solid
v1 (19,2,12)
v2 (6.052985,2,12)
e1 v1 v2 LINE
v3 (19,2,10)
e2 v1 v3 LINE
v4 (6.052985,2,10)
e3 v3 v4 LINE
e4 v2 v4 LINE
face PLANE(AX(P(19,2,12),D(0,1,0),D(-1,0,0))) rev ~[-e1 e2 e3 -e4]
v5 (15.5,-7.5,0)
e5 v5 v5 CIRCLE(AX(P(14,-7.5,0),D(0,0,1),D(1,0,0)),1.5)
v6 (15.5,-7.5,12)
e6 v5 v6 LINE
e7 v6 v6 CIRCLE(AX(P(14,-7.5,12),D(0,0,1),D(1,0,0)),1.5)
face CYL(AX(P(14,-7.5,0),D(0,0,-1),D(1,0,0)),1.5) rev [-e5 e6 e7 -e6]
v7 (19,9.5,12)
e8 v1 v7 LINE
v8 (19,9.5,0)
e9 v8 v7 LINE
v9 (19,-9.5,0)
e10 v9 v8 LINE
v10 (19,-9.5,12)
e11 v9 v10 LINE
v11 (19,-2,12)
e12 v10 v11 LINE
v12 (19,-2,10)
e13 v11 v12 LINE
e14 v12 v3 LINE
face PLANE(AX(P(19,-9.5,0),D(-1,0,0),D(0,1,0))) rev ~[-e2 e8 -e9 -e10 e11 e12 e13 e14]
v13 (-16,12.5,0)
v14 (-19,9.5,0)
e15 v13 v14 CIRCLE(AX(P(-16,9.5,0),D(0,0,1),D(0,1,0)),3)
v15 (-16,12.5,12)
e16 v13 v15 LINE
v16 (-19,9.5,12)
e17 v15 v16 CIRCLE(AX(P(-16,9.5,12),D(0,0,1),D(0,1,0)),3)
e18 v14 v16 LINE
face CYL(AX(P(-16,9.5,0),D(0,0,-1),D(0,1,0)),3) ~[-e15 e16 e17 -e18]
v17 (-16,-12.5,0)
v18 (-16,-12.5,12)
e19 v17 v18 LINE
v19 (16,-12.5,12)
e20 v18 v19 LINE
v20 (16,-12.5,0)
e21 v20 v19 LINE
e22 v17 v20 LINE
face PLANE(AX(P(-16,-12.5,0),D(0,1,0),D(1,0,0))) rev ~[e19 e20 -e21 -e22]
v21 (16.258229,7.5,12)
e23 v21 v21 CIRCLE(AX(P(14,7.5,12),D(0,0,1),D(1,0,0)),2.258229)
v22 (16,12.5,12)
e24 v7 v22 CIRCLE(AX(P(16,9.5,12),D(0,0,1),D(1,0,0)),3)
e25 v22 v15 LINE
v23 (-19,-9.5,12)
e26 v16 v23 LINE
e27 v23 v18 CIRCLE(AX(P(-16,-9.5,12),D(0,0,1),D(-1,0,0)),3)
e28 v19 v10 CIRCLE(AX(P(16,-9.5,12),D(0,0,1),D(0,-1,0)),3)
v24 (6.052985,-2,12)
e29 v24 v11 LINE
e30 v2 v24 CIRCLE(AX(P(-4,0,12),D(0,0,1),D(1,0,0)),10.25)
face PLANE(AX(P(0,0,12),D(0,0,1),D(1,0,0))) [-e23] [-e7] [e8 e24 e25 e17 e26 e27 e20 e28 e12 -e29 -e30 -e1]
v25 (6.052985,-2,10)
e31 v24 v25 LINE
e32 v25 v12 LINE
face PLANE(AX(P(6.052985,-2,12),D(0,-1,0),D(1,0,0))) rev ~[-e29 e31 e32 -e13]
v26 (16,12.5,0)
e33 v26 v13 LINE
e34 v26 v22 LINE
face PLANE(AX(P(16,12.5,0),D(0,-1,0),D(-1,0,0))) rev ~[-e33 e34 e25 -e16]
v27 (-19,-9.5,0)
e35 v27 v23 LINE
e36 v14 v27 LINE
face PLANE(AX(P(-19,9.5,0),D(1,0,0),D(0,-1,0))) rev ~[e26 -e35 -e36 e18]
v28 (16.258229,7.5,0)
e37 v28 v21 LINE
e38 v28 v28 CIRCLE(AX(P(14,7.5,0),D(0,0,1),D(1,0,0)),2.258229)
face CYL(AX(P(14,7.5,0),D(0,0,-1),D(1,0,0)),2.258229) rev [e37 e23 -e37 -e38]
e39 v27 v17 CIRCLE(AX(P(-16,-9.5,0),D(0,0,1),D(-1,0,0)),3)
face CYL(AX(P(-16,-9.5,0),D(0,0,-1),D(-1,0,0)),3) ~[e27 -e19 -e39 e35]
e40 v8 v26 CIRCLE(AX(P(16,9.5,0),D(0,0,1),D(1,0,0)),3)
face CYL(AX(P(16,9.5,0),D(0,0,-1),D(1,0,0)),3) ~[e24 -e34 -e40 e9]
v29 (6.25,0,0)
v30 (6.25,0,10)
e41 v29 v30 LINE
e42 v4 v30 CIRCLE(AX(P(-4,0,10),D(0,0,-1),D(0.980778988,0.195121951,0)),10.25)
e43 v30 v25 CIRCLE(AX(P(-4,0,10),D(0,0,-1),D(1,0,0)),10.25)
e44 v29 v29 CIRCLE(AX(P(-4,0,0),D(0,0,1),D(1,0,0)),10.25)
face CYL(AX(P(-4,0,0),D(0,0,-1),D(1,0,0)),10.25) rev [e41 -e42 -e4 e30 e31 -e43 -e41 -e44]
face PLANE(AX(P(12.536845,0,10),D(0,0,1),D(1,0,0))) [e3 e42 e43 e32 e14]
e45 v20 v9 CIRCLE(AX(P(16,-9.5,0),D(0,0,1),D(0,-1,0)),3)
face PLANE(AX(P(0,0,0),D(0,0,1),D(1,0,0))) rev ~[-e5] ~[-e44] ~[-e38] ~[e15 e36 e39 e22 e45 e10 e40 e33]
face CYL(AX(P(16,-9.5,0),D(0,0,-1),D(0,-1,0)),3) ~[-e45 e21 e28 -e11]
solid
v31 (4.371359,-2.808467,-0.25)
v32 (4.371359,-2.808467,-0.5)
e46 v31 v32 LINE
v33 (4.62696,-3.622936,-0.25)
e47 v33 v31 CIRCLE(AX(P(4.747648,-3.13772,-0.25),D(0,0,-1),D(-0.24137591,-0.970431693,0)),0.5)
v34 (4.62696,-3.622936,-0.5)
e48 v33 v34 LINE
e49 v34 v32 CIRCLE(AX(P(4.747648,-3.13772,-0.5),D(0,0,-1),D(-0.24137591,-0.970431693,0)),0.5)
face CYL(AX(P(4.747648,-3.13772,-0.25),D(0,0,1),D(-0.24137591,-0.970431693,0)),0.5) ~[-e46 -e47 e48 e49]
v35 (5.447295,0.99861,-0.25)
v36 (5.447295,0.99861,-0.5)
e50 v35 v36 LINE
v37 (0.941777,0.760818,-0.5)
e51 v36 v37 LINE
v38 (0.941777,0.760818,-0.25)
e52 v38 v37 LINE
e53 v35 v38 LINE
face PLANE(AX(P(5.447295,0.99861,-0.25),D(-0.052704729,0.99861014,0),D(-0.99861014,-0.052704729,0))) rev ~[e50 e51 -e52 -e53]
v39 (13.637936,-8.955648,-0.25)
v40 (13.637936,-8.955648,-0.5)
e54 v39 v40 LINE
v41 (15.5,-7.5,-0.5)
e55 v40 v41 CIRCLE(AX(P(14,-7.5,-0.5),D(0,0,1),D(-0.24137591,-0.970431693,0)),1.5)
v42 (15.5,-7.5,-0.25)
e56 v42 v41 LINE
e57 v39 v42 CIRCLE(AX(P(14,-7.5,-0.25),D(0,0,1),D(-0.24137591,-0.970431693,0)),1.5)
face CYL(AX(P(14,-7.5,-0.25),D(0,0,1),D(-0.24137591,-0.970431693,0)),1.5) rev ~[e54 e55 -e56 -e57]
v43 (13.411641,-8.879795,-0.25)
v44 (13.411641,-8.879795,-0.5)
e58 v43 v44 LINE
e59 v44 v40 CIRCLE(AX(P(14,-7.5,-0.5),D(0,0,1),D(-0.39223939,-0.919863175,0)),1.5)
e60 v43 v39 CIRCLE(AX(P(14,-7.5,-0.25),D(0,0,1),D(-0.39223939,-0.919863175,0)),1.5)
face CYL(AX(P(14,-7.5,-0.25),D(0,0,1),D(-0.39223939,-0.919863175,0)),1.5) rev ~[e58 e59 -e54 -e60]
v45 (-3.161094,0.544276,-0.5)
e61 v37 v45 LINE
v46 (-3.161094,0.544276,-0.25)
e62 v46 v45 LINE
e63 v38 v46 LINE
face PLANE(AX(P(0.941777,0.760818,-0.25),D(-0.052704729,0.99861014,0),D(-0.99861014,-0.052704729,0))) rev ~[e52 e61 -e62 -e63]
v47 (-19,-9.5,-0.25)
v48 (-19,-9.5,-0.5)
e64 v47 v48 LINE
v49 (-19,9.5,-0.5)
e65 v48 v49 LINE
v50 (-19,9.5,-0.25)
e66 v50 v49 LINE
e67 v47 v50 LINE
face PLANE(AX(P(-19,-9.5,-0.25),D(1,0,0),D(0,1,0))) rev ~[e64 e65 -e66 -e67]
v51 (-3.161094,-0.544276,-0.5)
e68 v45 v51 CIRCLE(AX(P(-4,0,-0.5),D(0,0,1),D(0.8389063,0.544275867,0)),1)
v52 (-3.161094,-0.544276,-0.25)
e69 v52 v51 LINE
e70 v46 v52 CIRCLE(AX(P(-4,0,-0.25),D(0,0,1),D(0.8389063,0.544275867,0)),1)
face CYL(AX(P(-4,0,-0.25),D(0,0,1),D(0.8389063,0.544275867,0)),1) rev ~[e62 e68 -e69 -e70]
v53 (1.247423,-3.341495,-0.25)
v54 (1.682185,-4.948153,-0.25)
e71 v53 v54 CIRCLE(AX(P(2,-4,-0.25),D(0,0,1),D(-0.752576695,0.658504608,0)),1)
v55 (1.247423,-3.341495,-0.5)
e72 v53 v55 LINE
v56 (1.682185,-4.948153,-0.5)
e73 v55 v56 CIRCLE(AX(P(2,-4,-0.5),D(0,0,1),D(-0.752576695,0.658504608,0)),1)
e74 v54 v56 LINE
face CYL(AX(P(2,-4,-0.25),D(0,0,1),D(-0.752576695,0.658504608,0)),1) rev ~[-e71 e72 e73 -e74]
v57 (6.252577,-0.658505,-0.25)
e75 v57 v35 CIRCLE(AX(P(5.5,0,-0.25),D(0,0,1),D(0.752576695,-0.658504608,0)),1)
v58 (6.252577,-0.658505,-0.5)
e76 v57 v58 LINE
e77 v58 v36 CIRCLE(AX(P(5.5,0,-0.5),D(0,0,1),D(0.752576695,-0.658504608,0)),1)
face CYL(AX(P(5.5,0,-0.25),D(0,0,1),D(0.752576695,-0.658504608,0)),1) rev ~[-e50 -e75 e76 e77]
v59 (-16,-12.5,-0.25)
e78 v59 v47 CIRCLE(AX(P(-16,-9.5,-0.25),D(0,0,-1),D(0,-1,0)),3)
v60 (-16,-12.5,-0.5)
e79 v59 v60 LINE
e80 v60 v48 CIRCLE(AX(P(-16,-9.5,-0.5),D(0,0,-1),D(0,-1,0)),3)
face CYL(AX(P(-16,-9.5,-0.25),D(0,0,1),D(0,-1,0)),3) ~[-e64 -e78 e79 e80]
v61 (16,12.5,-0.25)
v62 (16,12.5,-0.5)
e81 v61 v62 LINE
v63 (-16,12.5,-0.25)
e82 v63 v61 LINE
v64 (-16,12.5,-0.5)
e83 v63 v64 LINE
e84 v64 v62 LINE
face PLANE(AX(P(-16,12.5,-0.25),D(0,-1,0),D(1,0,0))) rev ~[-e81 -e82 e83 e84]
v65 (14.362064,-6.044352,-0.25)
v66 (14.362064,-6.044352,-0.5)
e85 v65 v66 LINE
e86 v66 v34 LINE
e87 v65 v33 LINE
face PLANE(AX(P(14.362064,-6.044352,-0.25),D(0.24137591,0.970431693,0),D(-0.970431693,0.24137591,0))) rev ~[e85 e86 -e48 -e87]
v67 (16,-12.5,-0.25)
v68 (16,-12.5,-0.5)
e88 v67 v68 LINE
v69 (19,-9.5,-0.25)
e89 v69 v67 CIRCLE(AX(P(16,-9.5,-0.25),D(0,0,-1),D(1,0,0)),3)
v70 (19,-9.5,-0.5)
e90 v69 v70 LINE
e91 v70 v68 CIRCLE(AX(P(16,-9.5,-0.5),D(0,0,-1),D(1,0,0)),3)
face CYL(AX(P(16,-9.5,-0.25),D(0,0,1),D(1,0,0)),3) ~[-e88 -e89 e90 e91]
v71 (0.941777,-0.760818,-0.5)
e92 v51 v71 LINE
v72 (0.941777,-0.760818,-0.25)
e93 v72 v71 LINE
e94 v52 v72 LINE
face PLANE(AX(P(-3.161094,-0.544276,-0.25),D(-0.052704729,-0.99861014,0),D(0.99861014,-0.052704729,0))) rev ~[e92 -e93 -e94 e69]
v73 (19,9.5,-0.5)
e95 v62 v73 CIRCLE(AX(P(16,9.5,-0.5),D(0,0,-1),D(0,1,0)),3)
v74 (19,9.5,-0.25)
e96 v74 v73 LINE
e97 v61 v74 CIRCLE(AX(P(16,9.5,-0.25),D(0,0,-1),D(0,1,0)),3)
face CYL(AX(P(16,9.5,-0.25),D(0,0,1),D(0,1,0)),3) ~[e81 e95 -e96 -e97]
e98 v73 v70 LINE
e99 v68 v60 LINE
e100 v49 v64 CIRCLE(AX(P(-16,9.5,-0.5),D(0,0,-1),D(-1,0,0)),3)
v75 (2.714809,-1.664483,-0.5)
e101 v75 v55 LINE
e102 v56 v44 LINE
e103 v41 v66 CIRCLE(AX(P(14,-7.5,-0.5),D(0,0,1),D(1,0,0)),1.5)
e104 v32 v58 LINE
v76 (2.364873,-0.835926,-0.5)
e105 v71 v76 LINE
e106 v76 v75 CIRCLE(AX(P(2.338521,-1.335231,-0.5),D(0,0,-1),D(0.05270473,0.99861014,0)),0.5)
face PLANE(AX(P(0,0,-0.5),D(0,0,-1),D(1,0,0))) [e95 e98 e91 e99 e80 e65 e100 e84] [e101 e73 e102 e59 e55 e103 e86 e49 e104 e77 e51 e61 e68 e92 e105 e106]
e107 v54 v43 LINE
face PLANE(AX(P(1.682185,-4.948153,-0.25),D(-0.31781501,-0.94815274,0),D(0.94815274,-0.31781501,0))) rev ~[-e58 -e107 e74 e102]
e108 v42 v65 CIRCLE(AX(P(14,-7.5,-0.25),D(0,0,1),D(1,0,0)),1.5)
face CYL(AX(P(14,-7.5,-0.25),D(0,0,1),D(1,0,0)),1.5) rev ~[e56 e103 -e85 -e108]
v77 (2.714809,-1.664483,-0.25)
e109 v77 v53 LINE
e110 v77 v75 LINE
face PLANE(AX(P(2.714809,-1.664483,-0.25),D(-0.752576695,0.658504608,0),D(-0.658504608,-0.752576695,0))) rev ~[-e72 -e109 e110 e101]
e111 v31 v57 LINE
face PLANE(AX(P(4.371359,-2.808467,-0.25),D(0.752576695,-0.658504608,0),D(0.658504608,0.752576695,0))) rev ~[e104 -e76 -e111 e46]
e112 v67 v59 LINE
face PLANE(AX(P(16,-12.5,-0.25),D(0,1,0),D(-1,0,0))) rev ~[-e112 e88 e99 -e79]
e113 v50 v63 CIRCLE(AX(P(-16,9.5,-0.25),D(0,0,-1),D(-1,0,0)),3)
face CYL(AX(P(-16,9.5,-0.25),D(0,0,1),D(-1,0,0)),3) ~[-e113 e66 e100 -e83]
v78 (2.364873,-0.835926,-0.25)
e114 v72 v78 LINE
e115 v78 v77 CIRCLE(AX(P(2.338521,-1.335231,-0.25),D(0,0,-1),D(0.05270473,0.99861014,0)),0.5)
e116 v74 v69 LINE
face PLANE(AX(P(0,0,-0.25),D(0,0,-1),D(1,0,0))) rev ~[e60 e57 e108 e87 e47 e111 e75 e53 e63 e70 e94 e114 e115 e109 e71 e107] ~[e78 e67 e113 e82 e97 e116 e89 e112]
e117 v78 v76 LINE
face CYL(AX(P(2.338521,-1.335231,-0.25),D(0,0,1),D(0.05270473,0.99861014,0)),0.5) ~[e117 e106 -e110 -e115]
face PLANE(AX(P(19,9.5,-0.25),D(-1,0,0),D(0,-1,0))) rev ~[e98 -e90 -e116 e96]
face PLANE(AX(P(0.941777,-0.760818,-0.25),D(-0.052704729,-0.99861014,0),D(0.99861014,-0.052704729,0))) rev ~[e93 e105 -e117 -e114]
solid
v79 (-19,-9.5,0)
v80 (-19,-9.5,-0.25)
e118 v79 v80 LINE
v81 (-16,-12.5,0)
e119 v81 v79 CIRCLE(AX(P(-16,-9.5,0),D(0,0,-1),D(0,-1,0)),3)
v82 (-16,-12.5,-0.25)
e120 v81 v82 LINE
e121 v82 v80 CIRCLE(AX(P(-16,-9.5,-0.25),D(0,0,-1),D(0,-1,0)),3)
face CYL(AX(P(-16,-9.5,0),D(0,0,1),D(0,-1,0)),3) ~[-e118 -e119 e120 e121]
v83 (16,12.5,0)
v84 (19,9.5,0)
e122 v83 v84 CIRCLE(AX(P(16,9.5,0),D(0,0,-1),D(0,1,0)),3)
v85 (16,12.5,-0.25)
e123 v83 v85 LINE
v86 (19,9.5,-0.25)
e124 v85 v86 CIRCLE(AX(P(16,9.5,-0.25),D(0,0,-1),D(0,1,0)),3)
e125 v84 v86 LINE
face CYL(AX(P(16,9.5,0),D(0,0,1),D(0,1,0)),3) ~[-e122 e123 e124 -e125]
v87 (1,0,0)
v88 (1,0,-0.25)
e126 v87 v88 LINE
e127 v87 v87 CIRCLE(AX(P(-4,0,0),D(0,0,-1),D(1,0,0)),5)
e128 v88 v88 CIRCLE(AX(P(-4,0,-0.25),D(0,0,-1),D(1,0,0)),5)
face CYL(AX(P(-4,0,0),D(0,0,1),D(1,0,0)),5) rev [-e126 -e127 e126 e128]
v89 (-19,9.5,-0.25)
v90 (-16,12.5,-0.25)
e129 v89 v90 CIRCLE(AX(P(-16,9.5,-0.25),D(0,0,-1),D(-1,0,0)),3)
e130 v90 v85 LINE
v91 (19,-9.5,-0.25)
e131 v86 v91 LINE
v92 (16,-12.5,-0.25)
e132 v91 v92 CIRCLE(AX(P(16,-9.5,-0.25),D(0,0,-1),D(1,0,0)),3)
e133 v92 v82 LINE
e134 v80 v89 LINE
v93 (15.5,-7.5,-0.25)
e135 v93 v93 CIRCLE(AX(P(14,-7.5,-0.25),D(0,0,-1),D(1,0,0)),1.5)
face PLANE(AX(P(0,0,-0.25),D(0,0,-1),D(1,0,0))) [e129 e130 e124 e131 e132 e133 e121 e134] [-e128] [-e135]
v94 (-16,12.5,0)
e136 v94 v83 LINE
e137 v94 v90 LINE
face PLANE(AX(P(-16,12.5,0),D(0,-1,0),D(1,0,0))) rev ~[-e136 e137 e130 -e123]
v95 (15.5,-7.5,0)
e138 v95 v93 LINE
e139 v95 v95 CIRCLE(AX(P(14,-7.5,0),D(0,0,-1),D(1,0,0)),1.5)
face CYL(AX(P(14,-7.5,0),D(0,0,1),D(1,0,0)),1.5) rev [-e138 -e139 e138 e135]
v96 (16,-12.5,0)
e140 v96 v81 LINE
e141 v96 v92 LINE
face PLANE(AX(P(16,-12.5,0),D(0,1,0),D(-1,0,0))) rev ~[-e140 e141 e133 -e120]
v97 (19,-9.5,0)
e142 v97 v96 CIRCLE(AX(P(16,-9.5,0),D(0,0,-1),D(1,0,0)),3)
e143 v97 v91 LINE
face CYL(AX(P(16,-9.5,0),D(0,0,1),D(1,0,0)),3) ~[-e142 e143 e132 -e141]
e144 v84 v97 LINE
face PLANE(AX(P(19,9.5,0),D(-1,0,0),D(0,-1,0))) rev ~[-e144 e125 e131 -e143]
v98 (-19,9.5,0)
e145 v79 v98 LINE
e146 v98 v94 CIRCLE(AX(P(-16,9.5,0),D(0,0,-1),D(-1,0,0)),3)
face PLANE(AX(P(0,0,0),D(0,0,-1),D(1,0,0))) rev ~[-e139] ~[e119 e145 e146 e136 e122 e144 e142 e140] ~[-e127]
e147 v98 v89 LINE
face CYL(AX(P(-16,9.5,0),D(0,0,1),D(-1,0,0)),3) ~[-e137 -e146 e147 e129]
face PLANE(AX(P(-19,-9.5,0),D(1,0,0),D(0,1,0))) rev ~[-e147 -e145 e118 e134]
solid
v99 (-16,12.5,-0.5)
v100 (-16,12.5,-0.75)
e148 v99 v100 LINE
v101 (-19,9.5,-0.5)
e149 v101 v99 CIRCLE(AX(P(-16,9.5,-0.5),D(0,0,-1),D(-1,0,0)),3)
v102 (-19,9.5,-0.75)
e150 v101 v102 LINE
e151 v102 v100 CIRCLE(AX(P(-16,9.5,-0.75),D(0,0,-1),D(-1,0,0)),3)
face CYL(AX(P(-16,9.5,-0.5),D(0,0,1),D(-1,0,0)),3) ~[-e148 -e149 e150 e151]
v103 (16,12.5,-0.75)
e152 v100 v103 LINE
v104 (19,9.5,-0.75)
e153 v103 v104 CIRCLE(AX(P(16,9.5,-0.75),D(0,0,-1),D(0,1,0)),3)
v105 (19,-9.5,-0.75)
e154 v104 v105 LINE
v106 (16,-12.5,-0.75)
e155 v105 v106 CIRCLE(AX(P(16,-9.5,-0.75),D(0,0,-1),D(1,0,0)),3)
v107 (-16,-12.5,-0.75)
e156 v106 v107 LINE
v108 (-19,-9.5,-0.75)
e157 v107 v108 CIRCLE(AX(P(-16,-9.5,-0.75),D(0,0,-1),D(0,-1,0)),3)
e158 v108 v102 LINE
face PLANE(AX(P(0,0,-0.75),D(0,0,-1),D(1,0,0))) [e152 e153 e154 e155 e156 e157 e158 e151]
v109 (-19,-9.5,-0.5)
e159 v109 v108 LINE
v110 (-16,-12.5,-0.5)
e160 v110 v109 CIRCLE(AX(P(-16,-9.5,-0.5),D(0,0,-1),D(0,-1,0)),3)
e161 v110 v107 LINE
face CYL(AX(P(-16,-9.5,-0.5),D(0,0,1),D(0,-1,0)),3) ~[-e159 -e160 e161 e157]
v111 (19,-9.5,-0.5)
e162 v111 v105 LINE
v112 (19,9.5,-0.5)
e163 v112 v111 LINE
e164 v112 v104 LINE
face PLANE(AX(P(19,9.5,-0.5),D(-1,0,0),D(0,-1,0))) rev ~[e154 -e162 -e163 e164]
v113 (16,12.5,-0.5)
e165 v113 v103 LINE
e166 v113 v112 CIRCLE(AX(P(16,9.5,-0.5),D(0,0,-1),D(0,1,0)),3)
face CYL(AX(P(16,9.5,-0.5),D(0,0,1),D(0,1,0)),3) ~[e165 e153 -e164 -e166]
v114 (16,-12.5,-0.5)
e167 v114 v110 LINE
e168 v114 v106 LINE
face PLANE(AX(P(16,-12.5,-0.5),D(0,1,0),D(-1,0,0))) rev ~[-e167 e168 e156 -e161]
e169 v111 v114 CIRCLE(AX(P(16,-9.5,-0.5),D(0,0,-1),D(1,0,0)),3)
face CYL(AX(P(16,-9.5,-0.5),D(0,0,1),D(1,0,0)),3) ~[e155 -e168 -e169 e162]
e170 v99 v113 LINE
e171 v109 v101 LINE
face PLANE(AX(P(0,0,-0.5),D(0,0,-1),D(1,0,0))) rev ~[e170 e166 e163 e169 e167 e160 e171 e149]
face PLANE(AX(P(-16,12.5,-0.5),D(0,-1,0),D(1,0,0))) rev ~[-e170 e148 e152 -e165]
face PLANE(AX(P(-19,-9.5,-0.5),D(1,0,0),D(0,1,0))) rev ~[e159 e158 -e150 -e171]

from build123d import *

# Parameters (mm, degrees)
F0_R     = 1.5
F0_R_2   = 10.25
F0_R_3   = 2.2582291175
F1_DEPTH = 12
F3_DEPTH = 2
F4_R     = 2.2582291175
F4_R_2   = 10.25
F4_R_3   = 1.5
F4_R_4   = 5
F5_DEPTH = 0.25
F7_DEPTH = 0.25
F9_DEPTH = 0.25


with BuildPart() as f1:
    # F0 (on Top) → F1 (new body)
    with BuildSketch(Plane.XY):
        with BuildLine():
            Line((-16, -12.5), (16, -12.5))
            ThreePointArc((16, -12.5), (18.1213203436, -11.6213203436), (19, -9.5))
            Line((19, -9.5), (19, 9.5))
            ThreePointArc((19, 9.5), (18.1213203436, 11.6213203436), (16, 12.5))
            Line((16, 12.5), (-16, 12.5))
            ThreePointArc((-16, 12.5), (-18.1213203436, 11.6213203436), (-19, 9.5))
            Line((-19, 9.5), (-19, -9.5))
            ThreePointArc((-19, -9.5), (-18.1213203436, -11.6213203436), (-16, -12.5))
        make_face()
        with Locations((14, -7.5)):
            Circle(F0_R, mode=Mode.SUBTRACT)
        with Locations((-4, 0)):
            Circle(F0_R_2, mode=Mode.SUBTRACT)
        with Locations((14, 7.5)):
            Circle(F0_R_3, mode=Mode.SUBTRACT)
    extrude(amount=F1_DEPTH)

    # F2 (on face) → F3 (cut)
    with BuildSketch(Plane.XY.offset(12)):
        with BuildLine():
            Line((6.0529846314, -2), (19, -2))
            Line((19, -2), (19, 2))
            Line((19, 2), (6.0529846314, 2))
            ThreePointArc((6.0529846314, 2), (6.2006272472, 1.0048401683), (6.25, 0))
            ThreePointArc((6.25, 0), (6.2006272472, -1.0048401683), (6.0529846314, -2))
        make_face()
    extrude(amount=-F3_DEPTH, mode=Mode.SUBTRACT)


with BuildPart() as f5:
    # F4 (on face) → F5 (new body)
    with BuildSketch(Plane(origin=(0, 0, 0), x_dir=(1, 0, 0), z_dir=(0, 0, -1))):
        with BuildLine():
            Line((-16, -12.5), (16, -12.5))
            ThreePointArc((16, -12.5), (18.1213203436, -11.6213203436), (19, -9.5))
            Line((19, -9.5), (19, 9.5))
            ThreePointArc((19, 9.5), (18.1213203436, 11.6213203436), (16, 12.5))
            Line((16, 12.5), (-16, 12.5))
            ThreePointArc((-16, 12.5), (-18.1213203436, 11.6213203436), (-19, 9.5))
            Line((-19, 9.5), (-19, -9.5))
            ThreePointArc((-19, -9.5), (-18.1213203436, -11.6213203436), (-16, -12.5))
        make_face()
        with Locations((14, -7.5)):
            Circle(F4_R, mode=Mode.SUBTRACT)
        with Locations((-4, 0)):
            Circle(F4_R_2, mode=Mode.SUBTRACT)
        with Locations((14, 7.5)):
            Circle(F4_R_3, mode=Mode.SUBTRACT)
        with Locations((-4, 0)):
            Circle(F4_R_2)
        with Locations((-4, 0)):
            Circle(F4_R_4, mode=Mode.SUBTRACT)
        with Locations((14, -7.5)):
            Circle(F4_R)
    extrude(amount=F5_DEPTH)


with BuildPart() as f7:
    # F6 (on face) → F7 (new body)
    with BuildSketch(Plane(origin=(0, 0, -0.25), x_dir=(1, 0, 0), z_dir=(0, 0, -1))):
        with BuildLine():
            Line((-16, -12.5), (16, -12.5))
            ThreePointArc((16, -12.5), (18.1213203436, -11.6213203436), (19, -9.5))
            Line((19, -9.5), (19, 9.5))
            ThreePointArc((19, 9.5), (18.1213203436, 11.6213203436), (16, 12.5))
            Line((16, 12.5), (-16, 12.5))
            ThreePointArc((-16, 12.5), (-18.1213203436, 11.6213203436), (-19, 9.5))
            Line((-19, 9.5), (-19, -9.5))
            ThreePointArc((-19, -9.5), (-18.1213203436, -11.6213203436), (-16, -12.5))
        make_face()
        with BuildLine():
            ThreePointArc((15.5, 7.5), (15.1817562774, 6.5761752867), (14.3620638655, 6.0443524612))
            Line((14.3620638655, 6.0443524612), (4.6269595937, 3.6229356074))
            ThreePointArc((4.6269595937, 3.6229356074), (4.2705878532, 3.2874329762), (4.3713592015, 2.8084674572))
            Line((4.3713592015, 2.8084674572), (6.2525766947, 0.6585046079))
            ThreePointArc((6.2525766947, 0.6585046079), (6.3994234341, -0.4370783525), (5.4472952705, -0.9986101399))
            Line((5.4472952705, -0.9986101399), (0.9417766772, -0.7608175028))
            ThreePointArc((0.9417766772, -0.7608175028), (-9, 0), (0.9417766772, 0.7608175028))
            Line((0.9417766772, 0.7608175028), (2.3648730135, 0.8359258002))
            ThreePointArc((2.3648730135, 0.8359258002), (2.7991253775, 1.1406973672), (2.7148089961, 1.6644831741))
            Line((2.7148089961, 1.6644831741), (1.2474233053, 3.3414953921))
            ThreePointArc((1.2474233053, 3.3414953921), (1.0347168502, 4.261205744), (1.6821849895, 4.9481527404))
            Line((1.6821849895, 4.9481527404), (13.4116409153, 8.8797947628))
            ThreePointArc((13.4116409153, 8.8797947628), (13.5232774843, 8.9222291106), (13.6379361345, 8.9556475388))
            ThreePointArc((13.6379361345, 8.9556475388), (14.9238247133, 8.6817562774), (15.5, 7.5))
        make_face(mode=Mode.SUBTRACT)
        with BuildLine():
            ThreePointArc((0.9417766772, 0.7608175028), (-9, 0), (0.9417766772, -0.7608175028))
            Line((0.9417766772, -0.7608175028), (-3.1610936997, -0.5442758669))
            ThreePointArc((-3.1610936997, -0.5442758669), (-5, 0), (-3.1610936997, 0.5442758669))
            Line((-3.1610936997, 0.5442758669), (0.9417766772, 0.7608175028))
        make_face()
    extrude(amount=F7_DEPTH)


with BuildPart() as f9:
    # F8 (on face) → F9 (new body)
    with BuildSketch(Plane(origin=(0, 0, -0.5), x_dir=(1, 0, 0), z_dir=(0, 0, -1))):
        with BuildLine():
            Line((-16, -12.5), (16, -12.5))
            ThreePointArc((16, -12.5), (18.1213203436, -11.6213203436), (19, -9.5))
            Line((19, -9.5), (19, 9.5))
            ThreePointArc((19, 9.5), (18.1213203436, 11.6213203436), (16, 12.5))
            Line((16, 12.5), (-16, 12.5))
            ThreePointArc((-16, 12.5), (-18.1213203436, 11.6213203436), (-19, 9.5))
            Line((-19, 9.5), (-19, -9.5))
            ThreePointArc((-19, -9.5), (-18.1213203436, -11.6213203436), (-16, -12.5))
        make_face()
        with BuildLine():
            Line((-3.1610936997, 0.5442758669), (2.3648730135, 0.8359258002))
            ThreePointArc((2.3648730135, 0.8359258002), (2.7991253775, 1.1406973672), (2.7148089961, 1.6644831741))
            Line((2.7148089961, 1.6644831741), (1.2474233053, 3.3414953921))
            ThreePointArc((1.2474233053, 3.3414953921), (1.0347168502, 4.261205744), (1.6821849895, 4.9481527404))
            Line((1.6821849895, 4.9481527404), (13.4116409153, 8.8797947628))
            ThreePointArc((13.4116409153, 8.8797947628), (15.4222291106, 7.9767225157), (14.3620638655, 6.0443524612))
            Line((14.3620638655, 6.0443524612), (4.6269595937, 3.6229356074))
            ThreePointArc((4.6269595937, 3.6229356074), (4.2705878532, 3.2874329762), (4.3713592015, 2.8084674572))
            Line((4.3713592015, 2.8084674572), (6.2525766947, 0.6585046079))
            ThreePointArc((6.2525766947, 0.6585046079), (6.3994234341, -0.4370783525), (5.4472952705, -0.9986101399))
            Line((5.4472952705, -0.9986101399), (-3.1610936997, -0.5442758669))
            ThreePointArc((-3.1610936997, -0.5442758669), (-5, 0), (-3.1610936997, 0.5442758669))
        make_face(mode=Mode.SUBTRACT)
        with BuildLine():
            ThreePointArc((2.7148089961, 1.6644831741), (2.7991253775, 1.1406973672), (2.3648730135, 0.8359258002))
            Line((2.3648730135, 0.8359258002), (-3.1610936997, 0.5442758669))
            ThreePointArc((-3.1610936997, 0.5442758669), (-5, 0), (-3.1610936997, -0.5442758669))
            Line((-3.1610936997, -0.5442758669), (5.4472952705, -0.9986101399))
            ThreePointArc((5.4472952705, -0.9986101399), (6.3994234341, -0.4370783525), (6.2525766947, 0.6585046079))
            Line((6.2525766947, 0.6585046079), (4.3713592015, 2.8084674572))
            ThreePointArc((4.3713592015, 2.8084674572), (4.2705878532, 3.2874329762), (4.6269595937, 3.6229356074))
            Line((4.6269595937, 3.6229356074), (14.3620638655, 6.0443524612))
            ThreePointArc((14.3620638655, 6.0443524612), (15.4222291106, 7.9767225157), (13.4116409153, 8.8797947628))
            Line((13.4116409153, 8.8797947628), (1.6821849895, 4.9481527404))
            ThreePointArc((1.6821849895, 4.9481527404), (1.0347168502, 4.261205744), (1.2474233053, 3.3414953921))
            Line((1.2474233053, 3.3414953921), (2.7148089961, 1.6644831741))
        make_face()
    extrude(amount=F9_DEPTH)


solid = Compound([f1.part, f5.part, f7.part, f9.part])
